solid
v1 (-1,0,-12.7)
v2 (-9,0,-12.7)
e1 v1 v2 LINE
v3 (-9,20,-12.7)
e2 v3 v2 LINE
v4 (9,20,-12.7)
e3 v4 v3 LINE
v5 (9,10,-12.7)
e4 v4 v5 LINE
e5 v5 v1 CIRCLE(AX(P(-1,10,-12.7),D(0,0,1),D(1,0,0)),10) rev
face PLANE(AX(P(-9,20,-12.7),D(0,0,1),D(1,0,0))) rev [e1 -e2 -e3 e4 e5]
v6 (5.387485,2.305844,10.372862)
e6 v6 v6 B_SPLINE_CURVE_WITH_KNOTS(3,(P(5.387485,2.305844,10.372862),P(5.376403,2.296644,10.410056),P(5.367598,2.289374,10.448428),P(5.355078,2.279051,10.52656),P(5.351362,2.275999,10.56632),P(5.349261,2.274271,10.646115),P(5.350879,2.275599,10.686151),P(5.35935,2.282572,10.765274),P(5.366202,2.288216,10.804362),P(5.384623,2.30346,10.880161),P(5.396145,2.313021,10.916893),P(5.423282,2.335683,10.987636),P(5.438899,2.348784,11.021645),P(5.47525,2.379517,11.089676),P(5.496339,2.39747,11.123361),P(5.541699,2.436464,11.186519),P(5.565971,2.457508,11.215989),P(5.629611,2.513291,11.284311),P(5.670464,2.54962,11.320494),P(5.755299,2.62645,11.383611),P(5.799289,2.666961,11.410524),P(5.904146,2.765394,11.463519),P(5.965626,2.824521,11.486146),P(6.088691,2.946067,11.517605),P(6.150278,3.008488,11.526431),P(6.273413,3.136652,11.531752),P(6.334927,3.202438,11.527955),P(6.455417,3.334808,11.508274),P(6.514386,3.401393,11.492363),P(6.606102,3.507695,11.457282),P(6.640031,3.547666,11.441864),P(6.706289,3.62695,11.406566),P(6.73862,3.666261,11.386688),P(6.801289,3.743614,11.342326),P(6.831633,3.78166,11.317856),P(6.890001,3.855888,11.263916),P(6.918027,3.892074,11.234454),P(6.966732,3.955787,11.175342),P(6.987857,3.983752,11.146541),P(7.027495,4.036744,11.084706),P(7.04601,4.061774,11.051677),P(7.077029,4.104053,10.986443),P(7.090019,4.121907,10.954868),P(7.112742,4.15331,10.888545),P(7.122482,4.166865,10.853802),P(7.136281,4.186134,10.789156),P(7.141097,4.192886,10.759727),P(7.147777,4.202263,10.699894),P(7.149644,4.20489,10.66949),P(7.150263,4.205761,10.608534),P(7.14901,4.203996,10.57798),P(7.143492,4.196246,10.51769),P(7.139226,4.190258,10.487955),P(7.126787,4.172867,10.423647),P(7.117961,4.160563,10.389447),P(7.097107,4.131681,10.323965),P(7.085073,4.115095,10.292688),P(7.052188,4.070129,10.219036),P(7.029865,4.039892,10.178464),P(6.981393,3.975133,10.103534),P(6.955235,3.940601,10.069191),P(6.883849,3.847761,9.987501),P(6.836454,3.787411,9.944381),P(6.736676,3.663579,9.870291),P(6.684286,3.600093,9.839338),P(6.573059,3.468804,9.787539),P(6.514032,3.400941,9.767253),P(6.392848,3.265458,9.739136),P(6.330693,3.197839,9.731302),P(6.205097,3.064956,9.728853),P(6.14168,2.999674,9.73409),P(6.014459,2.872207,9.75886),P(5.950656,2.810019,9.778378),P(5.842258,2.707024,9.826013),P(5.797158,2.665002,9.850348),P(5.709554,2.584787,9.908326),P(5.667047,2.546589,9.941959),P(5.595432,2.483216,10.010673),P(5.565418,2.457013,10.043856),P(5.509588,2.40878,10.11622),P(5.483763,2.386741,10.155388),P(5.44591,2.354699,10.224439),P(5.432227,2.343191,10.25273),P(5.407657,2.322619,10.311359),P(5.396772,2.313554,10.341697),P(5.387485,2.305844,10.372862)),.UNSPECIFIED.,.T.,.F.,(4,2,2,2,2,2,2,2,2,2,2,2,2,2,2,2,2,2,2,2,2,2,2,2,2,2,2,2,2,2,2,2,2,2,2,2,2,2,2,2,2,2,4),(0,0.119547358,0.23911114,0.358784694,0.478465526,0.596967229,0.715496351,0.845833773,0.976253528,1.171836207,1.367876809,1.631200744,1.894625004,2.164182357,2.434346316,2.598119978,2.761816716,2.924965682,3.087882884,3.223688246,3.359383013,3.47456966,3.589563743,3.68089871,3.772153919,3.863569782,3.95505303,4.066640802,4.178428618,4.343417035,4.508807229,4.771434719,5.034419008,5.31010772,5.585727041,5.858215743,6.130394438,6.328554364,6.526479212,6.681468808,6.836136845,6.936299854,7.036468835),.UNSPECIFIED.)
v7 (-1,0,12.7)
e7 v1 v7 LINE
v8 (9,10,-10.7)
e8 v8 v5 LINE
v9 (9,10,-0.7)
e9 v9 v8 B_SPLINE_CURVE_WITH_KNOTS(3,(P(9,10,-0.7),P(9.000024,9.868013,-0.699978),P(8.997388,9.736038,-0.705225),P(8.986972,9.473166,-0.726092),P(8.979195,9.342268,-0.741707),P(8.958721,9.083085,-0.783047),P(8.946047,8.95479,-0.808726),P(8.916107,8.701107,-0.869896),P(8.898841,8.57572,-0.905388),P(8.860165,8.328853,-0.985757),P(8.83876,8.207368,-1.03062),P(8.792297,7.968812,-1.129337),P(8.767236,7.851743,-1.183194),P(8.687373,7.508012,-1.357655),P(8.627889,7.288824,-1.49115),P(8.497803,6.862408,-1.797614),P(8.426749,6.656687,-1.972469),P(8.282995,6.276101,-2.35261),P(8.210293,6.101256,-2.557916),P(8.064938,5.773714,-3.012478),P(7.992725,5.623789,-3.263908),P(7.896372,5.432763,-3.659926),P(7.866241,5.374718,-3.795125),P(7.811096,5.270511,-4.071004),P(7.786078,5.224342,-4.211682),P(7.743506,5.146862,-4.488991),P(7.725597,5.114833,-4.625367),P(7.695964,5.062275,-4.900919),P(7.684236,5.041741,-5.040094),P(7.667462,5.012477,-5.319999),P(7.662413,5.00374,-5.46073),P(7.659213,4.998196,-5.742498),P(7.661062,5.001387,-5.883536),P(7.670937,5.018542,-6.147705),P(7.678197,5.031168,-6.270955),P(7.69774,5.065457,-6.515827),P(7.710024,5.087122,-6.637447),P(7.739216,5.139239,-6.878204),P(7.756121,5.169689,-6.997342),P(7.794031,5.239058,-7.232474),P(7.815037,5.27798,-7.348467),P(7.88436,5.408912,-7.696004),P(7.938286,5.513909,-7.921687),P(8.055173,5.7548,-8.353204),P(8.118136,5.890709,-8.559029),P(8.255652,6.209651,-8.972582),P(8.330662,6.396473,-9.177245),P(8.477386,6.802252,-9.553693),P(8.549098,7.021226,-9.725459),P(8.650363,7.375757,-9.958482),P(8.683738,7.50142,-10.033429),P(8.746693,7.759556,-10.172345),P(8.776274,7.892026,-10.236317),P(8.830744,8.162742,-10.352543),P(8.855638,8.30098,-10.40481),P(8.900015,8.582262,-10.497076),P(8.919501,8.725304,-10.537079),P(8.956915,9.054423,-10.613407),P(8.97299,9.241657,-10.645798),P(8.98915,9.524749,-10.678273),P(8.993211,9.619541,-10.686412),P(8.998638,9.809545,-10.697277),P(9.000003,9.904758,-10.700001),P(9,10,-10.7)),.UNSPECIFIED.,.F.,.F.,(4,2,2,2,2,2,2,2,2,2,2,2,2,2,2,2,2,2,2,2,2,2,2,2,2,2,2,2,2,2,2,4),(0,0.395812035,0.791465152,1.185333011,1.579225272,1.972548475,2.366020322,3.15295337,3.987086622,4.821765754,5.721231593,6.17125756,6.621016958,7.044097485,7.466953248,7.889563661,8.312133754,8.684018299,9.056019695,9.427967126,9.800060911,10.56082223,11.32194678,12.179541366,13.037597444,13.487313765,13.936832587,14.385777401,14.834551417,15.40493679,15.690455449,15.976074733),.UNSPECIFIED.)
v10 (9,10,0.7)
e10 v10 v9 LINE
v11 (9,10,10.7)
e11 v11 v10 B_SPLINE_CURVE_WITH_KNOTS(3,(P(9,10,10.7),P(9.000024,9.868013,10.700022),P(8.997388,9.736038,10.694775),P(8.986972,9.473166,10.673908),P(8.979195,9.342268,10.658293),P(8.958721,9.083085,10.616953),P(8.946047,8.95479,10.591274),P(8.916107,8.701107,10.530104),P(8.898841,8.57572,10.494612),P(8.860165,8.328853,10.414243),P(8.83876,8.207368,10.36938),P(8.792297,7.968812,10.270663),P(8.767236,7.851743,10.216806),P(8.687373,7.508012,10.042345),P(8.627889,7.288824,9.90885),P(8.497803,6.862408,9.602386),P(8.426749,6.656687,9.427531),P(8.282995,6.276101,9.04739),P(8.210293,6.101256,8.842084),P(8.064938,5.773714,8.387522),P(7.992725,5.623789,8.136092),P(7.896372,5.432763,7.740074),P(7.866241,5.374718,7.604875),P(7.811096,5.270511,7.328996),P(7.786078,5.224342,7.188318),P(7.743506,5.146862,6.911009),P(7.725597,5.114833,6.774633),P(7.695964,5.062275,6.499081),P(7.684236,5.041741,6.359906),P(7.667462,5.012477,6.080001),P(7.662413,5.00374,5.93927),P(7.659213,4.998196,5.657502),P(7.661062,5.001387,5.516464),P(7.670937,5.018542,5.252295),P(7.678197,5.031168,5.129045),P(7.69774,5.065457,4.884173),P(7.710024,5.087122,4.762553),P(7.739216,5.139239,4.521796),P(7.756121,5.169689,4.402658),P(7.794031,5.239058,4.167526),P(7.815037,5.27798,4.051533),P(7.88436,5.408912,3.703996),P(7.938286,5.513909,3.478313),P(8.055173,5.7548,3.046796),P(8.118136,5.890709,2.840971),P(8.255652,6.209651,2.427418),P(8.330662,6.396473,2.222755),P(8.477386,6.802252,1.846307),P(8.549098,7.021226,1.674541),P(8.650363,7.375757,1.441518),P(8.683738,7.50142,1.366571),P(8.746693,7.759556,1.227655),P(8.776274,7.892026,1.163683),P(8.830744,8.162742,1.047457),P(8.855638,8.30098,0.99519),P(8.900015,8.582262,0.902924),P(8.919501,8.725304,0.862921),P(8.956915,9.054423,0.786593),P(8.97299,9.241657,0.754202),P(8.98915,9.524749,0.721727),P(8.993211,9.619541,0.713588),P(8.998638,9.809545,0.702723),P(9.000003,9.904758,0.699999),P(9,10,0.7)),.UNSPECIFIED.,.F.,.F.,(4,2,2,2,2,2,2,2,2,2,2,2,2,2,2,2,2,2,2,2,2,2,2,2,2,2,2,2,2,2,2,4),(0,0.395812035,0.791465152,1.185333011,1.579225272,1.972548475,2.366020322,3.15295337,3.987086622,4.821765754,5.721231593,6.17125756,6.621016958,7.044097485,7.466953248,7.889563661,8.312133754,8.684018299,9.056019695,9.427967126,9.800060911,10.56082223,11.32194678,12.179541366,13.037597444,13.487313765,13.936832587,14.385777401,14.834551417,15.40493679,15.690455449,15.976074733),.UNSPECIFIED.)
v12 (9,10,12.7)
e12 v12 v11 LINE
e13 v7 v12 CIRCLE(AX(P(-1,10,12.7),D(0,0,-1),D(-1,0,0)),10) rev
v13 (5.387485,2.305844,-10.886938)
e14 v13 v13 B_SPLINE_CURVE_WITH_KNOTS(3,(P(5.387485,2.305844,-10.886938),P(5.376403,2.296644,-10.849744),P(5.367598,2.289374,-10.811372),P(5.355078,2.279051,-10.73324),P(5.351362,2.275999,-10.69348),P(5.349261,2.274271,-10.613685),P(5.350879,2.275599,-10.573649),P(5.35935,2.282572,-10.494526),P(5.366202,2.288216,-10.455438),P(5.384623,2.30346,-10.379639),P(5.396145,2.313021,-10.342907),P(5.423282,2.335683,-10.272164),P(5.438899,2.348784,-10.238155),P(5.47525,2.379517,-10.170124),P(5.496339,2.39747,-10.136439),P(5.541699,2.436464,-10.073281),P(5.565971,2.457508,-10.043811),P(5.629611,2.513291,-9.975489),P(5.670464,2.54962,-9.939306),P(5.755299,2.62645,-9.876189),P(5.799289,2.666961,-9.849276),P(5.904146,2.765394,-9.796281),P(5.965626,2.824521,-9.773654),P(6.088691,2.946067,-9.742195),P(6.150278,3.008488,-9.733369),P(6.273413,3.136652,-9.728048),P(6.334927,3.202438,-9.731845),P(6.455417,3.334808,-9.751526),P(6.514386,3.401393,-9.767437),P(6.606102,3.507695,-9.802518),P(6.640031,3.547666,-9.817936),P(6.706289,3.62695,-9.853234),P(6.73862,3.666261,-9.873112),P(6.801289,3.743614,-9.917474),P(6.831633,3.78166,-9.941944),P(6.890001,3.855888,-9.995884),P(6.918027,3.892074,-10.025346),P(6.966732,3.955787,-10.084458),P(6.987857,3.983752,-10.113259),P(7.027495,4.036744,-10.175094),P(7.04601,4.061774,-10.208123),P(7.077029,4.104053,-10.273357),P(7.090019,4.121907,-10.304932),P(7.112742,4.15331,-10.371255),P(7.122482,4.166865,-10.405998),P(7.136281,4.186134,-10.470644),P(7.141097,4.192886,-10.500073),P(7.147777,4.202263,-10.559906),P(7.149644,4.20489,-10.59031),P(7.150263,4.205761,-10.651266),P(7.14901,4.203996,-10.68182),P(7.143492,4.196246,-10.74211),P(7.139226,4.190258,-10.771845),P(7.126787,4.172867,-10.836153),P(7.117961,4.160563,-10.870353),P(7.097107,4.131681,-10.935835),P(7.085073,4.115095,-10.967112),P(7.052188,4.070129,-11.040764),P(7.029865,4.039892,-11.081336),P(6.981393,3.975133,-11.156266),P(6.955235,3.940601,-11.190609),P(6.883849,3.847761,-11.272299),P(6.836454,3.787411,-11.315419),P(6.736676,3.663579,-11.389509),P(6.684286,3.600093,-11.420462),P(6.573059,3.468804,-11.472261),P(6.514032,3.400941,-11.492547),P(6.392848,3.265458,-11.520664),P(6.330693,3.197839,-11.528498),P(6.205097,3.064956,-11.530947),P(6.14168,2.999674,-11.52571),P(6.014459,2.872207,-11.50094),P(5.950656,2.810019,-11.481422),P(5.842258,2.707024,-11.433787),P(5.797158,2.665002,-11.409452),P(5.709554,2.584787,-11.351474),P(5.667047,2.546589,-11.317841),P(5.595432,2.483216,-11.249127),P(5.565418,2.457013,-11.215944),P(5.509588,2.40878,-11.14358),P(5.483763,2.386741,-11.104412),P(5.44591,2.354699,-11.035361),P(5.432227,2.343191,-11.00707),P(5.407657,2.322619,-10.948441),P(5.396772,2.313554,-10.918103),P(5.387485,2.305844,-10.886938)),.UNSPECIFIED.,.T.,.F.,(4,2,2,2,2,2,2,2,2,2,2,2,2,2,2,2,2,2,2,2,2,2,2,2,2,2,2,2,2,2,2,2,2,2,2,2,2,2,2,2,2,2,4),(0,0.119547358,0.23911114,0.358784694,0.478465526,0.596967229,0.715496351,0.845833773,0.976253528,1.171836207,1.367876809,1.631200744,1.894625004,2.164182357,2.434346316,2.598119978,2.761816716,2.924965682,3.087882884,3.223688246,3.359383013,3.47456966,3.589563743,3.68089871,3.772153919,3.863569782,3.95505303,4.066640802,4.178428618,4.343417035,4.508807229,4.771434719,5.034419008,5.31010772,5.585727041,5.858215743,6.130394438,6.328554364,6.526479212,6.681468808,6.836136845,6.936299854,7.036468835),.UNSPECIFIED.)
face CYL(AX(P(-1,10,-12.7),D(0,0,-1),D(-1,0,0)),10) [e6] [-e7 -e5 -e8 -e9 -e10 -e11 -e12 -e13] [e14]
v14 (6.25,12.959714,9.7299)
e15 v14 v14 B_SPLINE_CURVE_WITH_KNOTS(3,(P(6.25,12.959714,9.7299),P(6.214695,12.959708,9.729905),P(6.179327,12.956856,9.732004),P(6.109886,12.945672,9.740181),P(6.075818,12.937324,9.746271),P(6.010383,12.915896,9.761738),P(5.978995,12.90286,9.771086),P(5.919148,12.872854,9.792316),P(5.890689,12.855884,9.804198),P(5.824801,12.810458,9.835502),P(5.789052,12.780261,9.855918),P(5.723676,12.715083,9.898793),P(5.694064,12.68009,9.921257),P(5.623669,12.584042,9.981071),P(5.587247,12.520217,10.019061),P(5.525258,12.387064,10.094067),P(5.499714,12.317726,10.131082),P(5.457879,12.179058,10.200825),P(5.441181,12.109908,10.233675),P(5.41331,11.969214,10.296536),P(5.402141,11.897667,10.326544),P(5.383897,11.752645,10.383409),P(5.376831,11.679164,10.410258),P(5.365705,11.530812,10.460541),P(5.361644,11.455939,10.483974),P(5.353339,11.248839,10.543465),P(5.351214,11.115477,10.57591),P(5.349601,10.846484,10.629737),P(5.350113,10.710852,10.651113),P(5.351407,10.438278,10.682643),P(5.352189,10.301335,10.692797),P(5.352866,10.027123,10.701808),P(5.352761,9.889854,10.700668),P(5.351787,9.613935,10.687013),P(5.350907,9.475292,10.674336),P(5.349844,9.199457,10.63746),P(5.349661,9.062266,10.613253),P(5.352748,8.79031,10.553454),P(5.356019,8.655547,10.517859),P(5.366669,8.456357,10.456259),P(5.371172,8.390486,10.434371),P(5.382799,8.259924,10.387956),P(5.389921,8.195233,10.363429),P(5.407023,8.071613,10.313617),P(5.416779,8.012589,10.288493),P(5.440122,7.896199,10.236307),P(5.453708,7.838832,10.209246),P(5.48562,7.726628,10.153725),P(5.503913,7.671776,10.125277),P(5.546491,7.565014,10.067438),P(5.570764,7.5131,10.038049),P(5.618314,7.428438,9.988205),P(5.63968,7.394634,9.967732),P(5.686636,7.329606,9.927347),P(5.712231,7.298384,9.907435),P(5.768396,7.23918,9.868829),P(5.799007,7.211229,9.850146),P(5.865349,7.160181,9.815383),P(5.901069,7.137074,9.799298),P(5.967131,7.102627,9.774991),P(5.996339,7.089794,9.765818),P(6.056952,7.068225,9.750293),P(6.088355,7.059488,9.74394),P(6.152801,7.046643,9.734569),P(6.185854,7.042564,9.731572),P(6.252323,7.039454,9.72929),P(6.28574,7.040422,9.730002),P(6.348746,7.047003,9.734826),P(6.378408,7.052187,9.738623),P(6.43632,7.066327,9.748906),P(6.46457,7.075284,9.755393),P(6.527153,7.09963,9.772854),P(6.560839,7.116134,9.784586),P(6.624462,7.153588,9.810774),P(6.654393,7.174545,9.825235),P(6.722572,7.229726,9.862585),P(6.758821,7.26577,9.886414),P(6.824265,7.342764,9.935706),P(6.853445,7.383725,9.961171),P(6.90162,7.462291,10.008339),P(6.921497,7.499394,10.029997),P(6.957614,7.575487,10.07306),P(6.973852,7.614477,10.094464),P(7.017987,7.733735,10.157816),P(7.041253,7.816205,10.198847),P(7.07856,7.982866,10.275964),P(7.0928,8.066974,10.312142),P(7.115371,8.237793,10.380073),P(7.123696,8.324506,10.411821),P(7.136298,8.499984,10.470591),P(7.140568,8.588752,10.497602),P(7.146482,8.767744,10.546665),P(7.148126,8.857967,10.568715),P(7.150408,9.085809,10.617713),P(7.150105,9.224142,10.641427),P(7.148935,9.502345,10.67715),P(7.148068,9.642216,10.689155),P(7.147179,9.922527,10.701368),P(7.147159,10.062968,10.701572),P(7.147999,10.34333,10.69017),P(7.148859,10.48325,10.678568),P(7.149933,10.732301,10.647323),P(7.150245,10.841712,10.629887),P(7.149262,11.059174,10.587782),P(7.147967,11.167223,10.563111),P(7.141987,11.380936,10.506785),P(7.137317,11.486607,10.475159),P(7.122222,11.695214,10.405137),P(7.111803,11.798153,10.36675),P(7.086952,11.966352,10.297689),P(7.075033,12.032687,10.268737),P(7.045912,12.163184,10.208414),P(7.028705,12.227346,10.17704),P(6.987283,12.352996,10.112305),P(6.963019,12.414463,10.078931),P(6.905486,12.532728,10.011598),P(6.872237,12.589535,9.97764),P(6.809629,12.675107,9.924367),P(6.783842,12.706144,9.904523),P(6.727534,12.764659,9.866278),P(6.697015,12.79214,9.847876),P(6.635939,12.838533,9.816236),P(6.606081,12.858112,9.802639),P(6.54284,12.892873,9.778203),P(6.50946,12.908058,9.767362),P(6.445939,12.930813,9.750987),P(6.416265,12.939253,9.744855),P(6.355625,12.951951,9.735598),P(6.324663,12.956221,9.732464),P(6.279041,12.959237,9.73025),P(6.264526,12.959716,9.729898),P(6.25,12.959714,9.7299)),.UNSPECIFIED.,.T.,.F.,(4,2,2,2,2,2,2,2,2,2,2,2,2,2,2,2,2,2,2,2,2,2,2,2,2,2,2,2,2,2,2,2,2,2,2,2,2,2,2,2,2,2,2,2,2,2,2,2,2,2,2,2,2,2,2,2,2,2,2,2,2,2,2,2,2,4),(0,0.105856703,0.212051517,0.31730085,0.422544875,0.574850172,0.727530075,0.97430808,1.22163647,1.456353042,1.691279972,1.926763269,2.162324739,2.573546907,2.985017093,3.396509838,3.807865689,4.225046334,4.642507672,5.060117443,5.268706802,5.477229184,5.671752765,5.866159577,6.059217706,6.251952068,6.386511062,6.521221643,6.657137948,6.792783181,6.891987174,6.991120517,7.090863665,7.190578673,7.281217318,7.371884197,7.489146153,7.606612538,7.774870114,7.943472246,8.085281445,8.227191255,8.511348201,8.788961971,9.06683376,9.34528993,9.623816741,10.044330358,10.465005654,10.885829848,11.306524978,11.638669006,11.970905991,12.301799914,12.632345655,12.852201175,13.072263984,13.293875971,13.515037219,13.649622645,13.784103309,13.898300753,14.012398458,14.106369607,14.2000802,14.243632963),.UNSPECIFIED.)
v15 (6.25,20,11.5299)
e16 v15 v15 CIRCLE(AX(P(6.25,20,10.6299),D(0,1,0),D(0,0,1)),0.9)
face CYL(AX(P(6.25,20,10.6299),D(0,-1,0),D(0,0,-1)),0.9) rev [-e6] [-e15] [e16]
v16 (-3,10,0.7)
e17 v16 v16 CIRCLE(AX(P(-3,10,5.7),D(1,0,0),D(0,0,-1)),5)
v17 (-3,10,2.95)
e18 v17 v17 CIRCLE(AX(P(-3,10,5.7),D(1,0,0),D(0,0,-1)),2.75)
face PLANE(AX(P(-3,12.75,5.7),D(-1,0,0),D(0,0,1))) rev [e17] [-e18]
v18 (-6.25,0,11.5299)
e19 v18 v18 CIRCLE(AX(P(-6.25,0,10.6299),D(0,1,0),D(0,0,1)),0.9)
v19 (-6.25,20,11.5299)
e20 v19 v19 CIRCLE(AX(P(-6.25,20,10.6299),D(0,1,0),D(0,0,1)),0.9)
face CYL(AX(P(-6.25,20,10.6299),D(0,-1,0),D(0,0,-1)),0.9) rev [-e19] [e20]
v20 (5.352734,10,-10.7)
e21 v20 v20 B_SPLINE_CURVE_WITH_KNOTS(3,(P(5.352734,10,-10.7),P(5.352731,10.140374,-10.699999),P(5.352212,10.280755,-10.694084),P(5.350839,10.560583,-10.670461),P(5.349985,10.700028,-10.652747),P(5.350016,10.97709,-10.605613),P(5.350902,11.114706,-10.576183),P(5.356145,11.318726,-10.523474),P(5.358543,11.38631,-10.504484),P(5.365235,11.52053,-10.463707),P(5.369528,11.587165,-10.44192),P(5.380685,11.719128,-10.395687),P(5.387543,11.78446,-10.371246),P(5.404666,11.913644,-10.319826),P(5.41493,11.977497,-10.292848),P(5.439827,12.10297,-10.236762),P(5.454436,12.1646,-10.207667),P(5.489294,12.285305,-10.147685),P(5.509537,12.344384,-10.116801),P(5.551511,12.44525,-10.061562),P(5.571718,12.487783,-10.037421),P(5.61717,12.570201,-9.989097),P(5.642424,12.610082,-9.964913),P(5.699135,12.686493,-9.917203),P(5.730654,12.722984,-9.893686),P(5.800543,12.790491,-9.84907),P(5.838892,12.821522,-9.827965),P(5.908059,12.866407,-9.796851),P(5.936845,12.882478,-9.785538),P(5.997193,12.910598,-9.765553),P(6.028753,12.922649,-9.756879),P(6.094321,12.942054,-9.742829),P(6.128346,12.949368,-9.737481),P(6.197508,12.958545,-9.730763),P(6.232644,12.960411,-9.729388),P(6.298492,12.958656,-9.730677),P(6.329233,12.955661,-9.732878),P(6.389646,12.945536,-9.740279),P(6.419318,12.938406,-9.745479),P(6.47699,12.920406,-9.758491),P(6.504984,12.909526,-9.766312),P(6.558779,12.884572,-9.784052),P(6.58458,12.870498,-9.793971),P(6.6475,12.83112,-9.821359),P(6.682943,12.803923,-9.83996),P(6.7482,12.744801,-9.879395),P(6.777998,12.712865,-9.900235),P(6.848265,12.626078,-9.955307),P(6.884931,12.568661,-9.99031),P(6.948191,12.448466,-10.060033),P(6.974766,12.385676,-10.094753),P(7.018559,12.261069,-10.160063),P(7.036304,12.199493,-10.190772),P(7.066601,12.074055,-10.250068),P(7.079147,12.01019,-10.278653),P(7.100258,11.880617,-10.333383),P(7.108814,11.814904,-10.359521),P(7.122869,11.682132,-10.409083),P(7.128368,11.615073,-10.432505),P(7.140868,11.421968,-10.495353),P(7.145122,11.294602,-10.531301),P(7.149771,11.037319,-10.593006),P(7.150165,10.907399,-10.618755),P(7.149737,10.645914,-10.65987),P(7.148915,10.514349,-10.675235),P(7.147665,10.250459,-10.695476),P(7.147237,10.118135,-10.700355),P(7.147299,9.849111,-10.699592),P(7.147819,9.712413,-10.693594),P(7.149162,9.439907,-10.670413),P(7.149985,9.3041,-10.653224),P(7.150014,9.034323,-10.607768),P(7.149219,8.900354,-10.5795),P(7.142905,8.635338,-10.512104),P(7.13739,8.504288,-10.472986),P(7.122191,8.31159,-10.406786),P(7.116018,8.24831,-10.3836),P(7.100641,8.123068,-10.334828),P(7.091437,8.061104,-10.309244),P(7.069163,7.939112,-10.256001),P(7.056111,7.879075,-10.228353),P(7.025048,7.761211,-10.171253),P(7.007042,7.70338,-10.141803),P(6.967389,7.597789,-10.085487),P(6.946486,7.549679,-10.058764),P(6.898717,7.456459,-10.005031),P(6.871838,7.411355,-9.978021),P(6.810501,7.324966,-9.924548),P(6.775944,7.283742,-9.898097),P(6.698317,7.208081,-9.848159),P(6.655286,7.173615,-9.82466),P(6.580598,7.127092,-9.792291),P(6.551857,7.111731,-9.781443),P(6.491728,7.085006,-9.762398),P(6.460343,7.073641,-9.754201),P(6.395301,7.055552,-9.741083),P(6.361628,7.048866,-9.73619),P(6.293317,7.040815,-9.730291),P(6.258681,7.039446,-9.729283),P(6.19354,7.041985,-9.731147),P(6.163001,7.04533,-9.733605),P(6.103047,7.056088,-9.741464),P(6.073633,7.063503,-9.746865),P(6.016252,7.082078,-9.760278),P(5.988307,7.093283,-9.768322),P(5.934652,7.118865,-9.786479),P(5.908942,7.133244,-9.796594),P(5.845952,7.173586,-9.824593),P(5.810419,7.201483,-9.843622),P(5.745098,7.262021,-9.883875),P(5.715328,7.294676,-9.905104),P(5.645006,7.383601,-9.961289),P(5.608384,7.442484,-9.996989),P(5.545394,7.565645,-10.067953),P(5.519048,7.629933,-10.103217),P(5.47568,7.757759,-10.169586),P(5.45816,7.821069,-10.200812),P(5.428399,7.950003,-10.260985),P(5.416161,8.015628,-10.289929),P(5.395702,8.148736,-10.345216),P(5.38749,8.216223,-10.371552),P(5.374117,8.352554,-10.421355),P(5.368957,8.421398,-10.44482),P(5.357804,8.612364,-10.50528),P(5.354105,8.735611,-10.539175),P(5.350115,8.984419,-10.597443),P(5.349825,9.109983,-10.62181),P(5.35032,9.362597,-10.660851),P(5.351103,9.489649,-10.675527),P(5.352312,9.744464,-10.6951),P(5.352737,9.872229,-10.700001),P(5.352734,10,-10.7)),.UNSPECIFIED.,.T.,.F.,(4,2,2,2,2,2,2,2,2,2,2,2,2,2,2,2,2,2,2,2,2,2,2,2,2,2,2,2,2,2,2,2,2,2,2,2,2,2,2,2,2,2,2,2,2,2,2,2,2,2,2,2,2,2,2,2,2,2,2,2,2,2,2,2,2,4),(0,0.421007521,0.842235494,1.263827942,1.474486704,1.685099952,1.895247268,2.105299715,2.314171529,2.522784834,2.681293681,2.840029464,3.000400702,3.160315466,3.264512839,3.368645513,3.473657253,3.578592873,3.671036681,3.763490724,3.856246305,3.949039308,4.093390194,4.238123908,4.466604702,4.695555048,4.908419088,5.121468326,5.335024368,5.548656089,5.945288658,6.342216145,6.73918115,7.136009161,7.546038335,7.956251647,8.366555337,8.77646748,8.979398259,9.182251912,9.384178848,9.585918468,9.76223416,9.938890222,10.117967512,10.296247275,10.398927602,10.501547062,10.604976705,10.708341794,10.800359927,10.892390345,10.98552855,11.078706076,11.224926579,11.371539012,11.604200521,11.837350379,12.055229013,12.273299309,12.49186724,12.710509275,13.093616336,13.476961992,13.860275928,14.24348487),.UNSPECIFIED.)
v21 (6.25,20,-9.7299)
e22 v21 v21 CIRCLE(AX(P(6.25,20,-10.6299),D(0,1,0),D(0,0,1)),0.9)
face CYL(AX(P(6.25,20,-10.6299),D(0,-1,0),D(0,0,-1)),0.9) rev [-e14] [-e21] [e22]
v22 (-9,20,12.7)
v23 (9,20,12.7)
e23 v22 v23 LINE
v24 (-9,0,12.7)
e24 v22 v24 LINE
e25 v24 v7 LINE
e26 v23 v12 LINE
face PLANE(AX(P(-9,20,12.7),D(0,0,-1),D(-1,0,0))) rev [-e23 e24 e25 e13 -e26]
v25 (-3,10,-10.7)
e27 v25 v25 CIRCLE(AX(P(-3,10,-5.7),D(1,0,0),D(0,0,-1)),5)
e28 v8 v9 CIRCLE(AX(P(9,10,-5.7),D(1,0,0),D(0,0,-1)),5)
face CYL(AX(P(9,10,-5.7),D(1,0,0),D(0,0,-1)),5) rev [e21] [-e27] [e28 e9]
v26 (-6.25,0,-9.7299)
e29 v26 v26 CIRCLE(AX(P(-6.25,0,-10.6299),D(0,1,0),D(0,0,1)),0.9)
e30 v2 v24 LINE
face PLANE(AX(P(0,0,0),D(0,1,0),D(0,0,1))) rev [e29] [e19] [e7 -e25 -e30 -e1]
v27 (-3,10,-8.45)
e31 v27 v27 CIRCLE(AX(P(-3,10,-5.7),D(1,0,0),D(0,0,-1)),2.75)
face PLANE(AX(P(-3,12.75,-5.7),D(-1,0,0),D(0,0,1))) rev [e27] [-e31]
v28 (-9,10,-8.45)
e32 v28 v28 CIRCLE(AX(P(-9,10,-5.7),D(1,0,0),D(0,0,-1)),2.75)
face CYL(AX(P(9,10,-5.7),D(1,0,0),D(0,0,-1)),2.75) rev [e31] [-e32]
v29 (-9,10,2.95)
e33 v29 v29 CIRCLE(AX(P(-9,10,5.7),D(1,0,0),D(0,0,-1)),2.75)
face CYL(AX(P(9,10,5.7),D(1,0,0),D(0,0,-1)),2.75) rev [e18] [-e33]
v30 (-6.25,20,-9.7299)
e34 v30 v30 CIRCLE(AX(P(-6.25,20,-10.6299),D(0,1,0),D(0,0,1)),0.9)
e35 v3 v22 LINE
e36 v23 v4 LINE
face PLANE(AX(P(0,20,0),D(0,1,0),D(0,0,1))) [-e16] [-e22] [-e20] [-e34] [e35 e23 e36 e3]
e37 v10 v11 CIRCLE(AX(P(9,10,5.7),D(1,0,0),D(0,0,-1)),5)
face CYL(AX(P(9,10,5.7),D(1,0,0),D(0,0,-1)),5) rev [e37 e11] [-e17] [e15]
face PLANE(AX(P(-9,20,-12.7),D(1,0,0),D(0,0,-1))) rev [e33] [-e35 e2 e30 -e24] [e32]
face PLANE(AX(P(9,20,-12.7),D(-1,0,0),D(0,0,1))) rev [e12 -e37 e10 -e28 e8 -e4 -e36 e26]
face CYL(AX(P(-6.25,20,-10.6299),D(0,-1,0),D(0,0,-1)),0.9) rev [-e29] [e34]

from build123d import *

# Parameters (mm, degrees)
SKETCH1_W                      = 18
SKETCH1_H                      = 25.4
SKETCH1_R                      = 0.9
BOSS_EXTRUDE1_DEPTH            = 20
CBORE_FOR_M5_SHCS1_D           = 5.5
CBORE_FOR_M5_SHCS1_CBORE_D     = 10
CBORE_FOR_M5_SHCS1_CBORE_DEPTH = 12
FILLET1_R                      = 10


with BuildPart() as part:
    # Sketch1 → Boss-Extrude1 (new body)
    with BuildSketch(Plane(origin=(0, 0, 0), x_dir=(1, 0, 0), z_dir=(0, 1, 0))):
        Rectangle(SKETCH1_W, SKETCH1_H)
        with Locations(Location((-6.25, 10.6299, 0), (0, 0, 270))):
            Circle(SKETCH1_R, mode=Mode.SUBTRACT)
        with Locations(Location((6.25, 10.6299, 0), (0, 0, 270))):
            Circle(SKETCH1_R, mode=Mode.SUBTRACT)
        with Locations(Location((6.25, -10.6299, 0), (0, 0, 270))):
            Circle(SKETCH1_R, mode=Mode.SUBTRACT)
        with Locations(Location((-6.25, -10.6299, 0), (0, 0, 270))):
            Circle(SKETCH1_R, mode=Mode.SUBTRACT)
    extrude(amount=BOSS_EXTRUDE1_DEPTH)

    # CBORE for M5 SHCS1 (through all)
    with Locations(Plane(origin=(9, 0, 0), x_dir=(0, 0, -1), z_dir=(1, 0, 0))):
        with Locations((-5.7, 10), (5.7, 10)):
            CounterBoreHole(CBORE_FOR_M5_SHCS1_D / 2, CBORE_FOR_M5_SHCS1_CBORE_D / 2, CBORE_FOR_M5_SHCS1_CBORE_DEPTH)

    # Fillet1
    # the kernel refuses this fillet: 10 mm, written as the material it takes off along each edge
    with BuildSketch(Plane(origin=(9, 0, -37.7), x_dir=(0, 1, 0), z_dir=(0, 0, 1))) as fillet1_piece_1:
        with BuildLine():
            CenterArc((FILLET1_R, FILLET1_R), FILLET1_R, 180, 90)
            Line((0, FILLET1_R), (0, 0))
            Line((0, 0), (FILLET1_R, 0))
        make_face()
    extrude(amount=75.4, mode=Mode.SUBTRACT)


solid = part.part
